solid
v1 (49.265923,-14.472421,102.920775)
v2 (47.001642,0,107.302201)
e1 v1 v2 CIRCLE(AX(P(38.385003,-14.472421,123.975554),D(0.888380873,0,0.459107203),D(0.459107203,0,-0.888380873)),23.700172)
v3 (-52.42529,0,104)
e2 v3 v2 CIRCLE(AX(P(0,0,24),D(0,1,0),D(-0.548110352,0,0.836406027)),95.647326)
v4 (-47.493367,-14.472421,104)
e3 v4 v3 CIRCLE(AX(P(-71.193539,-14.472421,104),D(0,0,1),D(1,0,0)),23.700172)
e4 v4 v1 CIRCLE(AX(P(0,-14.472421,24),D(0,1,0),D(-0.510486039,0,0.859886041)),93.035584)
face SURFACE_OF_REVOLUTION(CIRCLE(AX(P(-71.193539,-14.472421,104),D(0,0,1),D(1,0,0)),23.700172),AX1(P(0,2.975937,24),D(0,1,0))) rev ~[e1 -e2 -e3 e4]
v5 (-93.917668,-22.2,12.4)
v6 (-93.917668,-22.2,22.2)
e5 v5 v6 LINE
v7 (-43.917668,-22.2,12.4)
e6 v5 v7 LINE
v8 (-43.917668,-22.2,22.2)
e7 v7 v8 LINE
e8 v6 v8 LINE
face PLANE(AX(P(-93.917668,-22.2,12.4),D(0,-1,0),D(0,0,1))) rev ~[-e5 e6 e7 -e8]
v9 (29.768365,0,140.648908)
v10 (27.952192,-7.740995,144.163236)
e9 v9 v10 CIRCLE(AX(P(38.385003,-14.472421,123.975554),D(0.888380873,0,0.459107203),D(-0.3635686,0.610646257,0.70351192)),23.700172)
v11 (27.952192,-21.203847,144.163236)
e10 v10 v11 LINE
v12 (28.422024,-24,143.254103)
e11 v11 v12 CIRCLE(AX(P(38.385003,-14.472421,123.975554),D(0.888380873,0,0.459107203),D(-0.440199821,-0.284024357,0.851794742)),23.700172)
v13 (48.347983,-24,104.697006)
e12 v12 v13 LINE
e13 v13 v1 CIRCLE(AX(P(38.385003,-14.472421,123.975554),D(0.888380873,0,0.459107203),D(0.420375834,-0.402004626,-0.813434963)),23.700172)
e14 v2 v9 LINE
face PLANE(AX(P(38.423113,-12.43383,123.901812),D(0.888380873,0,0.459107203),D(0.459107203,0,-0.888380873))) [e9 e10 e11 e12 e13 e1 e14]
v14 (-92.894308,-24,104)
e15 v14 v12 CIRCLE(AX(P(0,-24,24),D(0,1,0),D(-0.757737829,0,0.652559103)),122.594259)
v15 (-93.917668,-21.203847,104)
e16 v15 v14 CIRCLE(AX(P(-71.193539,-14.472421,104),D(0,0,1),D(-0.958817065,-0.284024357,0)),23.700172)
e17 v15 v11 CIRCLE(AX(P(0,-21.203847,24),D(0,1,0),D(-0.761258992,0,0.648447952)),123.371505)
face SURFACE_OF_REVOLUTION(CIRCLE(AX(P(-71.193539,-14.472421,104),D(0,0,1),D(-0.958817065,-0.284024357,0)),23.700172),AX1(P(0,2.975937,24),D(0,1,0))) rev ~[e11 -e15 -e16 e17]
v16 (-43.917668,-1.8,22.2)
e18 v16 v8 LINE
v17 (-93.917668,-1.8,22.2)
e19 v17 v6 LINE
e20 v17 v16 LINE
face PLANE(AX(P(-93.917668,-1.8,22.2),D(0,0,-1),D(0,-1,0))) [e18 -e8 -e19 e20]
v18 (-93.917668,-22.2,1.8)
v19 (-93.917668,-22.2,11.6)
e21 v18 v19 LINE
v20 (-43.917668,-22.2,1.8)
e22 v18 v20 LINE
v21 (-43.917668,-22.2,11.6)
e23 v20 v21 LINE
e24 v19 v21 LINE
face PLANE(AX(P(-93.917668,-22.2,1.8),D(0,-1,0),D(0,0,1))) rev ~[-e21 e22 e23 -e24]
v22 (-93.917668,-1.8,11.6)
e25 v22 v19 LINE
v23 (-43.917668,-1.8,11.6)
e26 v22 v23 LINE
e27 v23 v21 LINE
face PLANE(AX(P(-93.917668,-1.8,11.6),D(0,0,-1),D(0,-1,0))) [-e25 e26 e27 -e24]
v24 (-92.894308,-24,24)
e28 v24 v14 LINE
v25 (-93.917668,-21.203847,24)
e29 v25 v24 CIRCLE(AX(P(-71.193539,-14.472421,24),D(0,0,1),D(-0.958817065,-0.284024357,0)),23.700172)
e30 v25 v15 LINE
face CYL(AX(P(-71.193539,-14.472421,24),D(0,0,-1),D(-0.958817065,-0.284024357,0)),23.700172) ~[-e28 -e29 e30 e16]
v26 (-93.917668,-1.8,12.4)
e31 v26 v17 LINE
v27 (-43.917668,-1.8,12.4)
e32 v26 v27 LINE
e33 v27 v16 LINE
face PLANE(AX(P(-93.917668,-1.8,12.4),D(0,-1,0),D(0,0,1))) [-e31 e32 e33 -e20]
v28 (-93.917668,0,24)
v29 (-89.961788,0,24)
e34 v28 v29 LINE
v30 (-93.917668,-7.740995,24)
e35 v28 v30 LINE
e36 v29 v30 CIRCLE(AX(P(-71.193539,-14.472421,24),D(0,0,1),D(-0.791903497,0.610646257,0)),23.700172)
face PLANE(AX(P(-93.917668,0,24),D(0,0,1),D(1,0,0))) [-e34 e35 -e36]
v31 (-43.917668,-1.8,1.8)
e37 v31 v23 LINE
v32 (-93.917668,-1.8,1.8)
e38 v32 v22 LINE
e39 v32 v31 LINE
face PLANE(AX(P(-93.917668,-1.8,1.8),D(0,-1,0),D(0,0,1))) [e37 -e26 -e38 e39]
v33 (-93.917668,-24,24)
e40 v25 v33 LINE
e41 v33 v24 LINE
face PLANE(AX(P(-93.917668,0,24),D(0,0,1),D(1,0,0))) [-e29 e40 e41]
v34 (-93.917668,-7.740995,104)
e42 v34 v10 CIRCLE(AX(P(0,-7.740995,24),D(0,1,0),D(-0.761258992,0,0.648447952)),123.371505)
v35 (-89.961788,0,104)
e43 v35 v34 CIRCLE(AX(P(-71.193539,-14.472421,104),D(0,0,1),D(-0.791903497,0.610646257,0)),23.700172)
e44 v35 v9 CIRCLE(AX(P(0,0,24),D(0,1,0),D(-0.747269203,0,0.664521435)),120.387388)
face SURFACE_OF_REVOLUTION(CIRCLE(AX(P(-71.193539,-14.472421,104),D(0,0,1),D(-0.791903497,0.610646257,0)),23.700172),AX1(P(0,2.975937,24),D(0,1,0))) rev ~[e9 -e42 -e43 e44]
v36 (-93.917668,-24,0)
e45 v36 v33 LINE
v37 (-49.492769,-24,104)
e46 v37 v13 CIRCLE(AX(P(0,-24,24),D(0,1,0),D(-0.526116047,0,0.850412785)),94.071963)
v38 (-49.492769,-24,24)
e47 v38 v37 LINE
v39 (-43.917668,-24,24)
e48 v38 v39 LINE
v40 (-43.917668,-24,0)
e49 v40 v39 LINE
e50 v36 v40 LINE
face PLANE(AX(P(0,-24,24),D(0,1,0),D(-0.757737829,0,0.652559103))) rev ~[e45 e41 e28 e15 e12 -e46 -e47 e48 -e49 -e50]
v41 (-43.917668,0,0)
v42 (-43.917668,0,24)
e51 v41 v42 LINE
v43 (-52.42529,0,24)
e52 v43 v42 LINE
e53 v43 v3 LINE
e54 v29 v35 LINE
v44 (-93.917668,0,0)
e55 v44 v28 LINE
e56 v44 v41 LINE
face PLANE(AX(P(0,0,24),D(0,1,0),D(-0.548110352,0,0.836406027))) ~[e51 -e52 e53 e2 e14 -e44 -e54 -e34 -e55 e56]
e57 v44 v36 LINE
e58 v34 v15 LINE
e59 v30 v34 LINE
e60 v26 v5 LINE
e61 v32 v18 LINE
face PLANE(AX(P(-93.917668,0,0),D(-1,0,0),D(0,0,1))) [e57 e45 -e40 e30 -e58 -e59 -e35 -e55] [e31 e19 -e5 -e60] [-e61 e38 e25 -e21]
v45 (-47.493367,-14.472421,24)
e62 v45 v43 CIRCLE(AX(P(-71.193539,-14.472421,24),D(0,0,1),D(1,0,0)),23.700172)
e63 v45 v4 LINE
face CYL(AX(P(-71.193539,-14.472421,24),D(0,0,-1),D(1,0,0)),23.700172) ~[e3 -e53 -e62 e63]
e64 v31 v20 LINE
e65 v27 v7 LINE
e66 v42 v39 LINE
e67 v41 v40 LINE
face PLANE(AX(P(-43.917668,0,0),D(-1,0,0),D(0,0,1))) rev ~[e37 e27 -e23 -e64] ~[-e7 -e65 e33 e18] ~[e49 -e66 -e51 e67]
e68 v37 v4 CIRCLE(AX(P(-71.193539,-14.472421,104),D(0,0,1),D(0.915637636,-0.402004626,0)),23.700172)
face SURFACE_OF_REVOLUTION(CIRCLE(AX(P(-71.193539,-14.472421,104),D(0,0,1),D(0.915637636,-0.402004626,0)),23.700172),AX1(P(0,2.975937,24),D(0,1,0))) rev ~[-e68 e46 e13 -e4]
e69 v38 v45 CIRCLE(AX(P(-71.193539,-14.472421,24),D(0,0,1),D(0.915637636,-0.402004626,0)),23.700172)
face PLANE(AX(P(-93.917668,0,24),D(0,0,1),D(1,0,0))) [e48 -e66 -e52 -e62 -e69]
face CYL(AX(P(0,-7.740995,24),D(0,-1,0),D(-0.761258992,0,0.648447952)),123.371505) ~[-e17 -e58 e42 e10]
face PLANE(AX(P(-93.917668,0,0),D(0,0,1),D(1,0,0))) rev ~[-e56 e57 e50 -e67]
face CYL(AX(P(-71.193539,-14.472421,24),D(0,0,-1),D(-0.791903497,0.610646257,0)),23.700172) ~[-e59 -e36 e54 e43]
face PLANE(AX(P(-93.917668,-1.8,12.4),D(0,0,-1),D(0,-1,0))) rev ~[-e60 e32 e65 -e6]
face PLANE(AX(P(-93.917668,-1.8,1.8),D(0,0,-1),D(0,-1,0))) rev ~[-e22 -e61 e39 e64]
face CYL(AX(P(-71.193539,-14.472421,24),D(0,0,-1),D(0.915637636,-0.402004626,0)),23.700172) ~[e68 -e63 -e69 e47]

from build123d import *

# Parameters (mm, degrees)
F0_W     = 50
F0_H     = 24
F1_DEPTH = 24
F3_W     = 20.4
F3_H     = 9.8
F4_DEPTH = 50.001
F5_DEPTH = 80
F7_ANGLE = 62.6704880326


with BuildPart() as f1:
    # F0 (on Front) → F1 (new body)
    with BuildSketch(Plane.XZ):
        with Locations((-68.9176678658, 12)):
            Rectangle(F0_W, F0_H)
    extrude(amount=F1_DEPTH)

    # F3 (on face) → F4 (cut, through all)
    with BuildSketch(Plane(origin=(-93.9176678658, 0, 0), x_dir=(0, -1, 0), z_dir=(-1, 0, 0))):
        with Locations((12, 6.7)):
            Rectangle(F3_W, F3_H)
        with Locations((12, 17.3)):
            Rectangle(F3_W, F3_H)
    extrude(amount=-F4_DEPTH, mode=Mode.SUBTRACT)

    # F2 (on face) → F5 (join)
    with BuildSketch(Plane.XY.offset(24)):
        with BuildLine():
            ThreePointArc((-49.4927692396, -24), (-47.9986026074, -19.3399762696), (-47.4933667129, -14.4724212587))
            ThreePointArc((-47.4933667129, -14.4724212587), (-48.7602054242, -6.8275726586), (-52.425289602, 0))
            Line((-52.425289602, 0), (-89.9617876104, 0))
            ThreePointArc((-89.9617876104, 0), (-92.2976878441, -3.6875692563), (-93.9176678658, -7.7409951716))
            Line((-93.9176678658, -7.7409951716), (-93.9176678658, -21.2038473458))
            ThreePointArc((-93.9176678658, -21.2038473458), (-93.4499426711, -22.6180106094), (-92.8943079727, -24))
            Line((-92.8943079727, -24), (-49.4927692396, -24))
        make_face()
    extrude(amount=F5_DEPTH)

    # F6 (on face) → F7 (revolve)
    with BuildSketch(Plane.XY.offset(104)):
        with BuildLine():
            ThreePointArc((-49.4927692396, -24), (-47.9986026074, -19.3399762696), (-47.4933667129, -14.4724212587))
            ThreePointArc((-47.4933667129, -14.4724212587), (-48.7602054242, -6.8275726586), (-52.425289602, 0))
            Line((-52.425289602, 0), (-89.9617876104, 0))
            ThreePointArc((-89.9617876104, 0), (-92.2976878441, -3.6875692563), (-93.9176678658, -7.7409951716))
            Line((-93.9176678658, -7.7409951716), (-93.9176678658, -21.2038473458))
            ThreePointArc((-93.9176678658, -21.2038473458), (-93.4499426711, -22.6180106094), (-92.8943079727, -24))
            Line((-92.8943079727, -24), (-49.4927692396, -24))
        make_face()
    revolve(axis=Axis((0, 2.9759369791, 24), (0, 1, 0)), revolution_arc=F7_ANGLE)


solid = f1.part
